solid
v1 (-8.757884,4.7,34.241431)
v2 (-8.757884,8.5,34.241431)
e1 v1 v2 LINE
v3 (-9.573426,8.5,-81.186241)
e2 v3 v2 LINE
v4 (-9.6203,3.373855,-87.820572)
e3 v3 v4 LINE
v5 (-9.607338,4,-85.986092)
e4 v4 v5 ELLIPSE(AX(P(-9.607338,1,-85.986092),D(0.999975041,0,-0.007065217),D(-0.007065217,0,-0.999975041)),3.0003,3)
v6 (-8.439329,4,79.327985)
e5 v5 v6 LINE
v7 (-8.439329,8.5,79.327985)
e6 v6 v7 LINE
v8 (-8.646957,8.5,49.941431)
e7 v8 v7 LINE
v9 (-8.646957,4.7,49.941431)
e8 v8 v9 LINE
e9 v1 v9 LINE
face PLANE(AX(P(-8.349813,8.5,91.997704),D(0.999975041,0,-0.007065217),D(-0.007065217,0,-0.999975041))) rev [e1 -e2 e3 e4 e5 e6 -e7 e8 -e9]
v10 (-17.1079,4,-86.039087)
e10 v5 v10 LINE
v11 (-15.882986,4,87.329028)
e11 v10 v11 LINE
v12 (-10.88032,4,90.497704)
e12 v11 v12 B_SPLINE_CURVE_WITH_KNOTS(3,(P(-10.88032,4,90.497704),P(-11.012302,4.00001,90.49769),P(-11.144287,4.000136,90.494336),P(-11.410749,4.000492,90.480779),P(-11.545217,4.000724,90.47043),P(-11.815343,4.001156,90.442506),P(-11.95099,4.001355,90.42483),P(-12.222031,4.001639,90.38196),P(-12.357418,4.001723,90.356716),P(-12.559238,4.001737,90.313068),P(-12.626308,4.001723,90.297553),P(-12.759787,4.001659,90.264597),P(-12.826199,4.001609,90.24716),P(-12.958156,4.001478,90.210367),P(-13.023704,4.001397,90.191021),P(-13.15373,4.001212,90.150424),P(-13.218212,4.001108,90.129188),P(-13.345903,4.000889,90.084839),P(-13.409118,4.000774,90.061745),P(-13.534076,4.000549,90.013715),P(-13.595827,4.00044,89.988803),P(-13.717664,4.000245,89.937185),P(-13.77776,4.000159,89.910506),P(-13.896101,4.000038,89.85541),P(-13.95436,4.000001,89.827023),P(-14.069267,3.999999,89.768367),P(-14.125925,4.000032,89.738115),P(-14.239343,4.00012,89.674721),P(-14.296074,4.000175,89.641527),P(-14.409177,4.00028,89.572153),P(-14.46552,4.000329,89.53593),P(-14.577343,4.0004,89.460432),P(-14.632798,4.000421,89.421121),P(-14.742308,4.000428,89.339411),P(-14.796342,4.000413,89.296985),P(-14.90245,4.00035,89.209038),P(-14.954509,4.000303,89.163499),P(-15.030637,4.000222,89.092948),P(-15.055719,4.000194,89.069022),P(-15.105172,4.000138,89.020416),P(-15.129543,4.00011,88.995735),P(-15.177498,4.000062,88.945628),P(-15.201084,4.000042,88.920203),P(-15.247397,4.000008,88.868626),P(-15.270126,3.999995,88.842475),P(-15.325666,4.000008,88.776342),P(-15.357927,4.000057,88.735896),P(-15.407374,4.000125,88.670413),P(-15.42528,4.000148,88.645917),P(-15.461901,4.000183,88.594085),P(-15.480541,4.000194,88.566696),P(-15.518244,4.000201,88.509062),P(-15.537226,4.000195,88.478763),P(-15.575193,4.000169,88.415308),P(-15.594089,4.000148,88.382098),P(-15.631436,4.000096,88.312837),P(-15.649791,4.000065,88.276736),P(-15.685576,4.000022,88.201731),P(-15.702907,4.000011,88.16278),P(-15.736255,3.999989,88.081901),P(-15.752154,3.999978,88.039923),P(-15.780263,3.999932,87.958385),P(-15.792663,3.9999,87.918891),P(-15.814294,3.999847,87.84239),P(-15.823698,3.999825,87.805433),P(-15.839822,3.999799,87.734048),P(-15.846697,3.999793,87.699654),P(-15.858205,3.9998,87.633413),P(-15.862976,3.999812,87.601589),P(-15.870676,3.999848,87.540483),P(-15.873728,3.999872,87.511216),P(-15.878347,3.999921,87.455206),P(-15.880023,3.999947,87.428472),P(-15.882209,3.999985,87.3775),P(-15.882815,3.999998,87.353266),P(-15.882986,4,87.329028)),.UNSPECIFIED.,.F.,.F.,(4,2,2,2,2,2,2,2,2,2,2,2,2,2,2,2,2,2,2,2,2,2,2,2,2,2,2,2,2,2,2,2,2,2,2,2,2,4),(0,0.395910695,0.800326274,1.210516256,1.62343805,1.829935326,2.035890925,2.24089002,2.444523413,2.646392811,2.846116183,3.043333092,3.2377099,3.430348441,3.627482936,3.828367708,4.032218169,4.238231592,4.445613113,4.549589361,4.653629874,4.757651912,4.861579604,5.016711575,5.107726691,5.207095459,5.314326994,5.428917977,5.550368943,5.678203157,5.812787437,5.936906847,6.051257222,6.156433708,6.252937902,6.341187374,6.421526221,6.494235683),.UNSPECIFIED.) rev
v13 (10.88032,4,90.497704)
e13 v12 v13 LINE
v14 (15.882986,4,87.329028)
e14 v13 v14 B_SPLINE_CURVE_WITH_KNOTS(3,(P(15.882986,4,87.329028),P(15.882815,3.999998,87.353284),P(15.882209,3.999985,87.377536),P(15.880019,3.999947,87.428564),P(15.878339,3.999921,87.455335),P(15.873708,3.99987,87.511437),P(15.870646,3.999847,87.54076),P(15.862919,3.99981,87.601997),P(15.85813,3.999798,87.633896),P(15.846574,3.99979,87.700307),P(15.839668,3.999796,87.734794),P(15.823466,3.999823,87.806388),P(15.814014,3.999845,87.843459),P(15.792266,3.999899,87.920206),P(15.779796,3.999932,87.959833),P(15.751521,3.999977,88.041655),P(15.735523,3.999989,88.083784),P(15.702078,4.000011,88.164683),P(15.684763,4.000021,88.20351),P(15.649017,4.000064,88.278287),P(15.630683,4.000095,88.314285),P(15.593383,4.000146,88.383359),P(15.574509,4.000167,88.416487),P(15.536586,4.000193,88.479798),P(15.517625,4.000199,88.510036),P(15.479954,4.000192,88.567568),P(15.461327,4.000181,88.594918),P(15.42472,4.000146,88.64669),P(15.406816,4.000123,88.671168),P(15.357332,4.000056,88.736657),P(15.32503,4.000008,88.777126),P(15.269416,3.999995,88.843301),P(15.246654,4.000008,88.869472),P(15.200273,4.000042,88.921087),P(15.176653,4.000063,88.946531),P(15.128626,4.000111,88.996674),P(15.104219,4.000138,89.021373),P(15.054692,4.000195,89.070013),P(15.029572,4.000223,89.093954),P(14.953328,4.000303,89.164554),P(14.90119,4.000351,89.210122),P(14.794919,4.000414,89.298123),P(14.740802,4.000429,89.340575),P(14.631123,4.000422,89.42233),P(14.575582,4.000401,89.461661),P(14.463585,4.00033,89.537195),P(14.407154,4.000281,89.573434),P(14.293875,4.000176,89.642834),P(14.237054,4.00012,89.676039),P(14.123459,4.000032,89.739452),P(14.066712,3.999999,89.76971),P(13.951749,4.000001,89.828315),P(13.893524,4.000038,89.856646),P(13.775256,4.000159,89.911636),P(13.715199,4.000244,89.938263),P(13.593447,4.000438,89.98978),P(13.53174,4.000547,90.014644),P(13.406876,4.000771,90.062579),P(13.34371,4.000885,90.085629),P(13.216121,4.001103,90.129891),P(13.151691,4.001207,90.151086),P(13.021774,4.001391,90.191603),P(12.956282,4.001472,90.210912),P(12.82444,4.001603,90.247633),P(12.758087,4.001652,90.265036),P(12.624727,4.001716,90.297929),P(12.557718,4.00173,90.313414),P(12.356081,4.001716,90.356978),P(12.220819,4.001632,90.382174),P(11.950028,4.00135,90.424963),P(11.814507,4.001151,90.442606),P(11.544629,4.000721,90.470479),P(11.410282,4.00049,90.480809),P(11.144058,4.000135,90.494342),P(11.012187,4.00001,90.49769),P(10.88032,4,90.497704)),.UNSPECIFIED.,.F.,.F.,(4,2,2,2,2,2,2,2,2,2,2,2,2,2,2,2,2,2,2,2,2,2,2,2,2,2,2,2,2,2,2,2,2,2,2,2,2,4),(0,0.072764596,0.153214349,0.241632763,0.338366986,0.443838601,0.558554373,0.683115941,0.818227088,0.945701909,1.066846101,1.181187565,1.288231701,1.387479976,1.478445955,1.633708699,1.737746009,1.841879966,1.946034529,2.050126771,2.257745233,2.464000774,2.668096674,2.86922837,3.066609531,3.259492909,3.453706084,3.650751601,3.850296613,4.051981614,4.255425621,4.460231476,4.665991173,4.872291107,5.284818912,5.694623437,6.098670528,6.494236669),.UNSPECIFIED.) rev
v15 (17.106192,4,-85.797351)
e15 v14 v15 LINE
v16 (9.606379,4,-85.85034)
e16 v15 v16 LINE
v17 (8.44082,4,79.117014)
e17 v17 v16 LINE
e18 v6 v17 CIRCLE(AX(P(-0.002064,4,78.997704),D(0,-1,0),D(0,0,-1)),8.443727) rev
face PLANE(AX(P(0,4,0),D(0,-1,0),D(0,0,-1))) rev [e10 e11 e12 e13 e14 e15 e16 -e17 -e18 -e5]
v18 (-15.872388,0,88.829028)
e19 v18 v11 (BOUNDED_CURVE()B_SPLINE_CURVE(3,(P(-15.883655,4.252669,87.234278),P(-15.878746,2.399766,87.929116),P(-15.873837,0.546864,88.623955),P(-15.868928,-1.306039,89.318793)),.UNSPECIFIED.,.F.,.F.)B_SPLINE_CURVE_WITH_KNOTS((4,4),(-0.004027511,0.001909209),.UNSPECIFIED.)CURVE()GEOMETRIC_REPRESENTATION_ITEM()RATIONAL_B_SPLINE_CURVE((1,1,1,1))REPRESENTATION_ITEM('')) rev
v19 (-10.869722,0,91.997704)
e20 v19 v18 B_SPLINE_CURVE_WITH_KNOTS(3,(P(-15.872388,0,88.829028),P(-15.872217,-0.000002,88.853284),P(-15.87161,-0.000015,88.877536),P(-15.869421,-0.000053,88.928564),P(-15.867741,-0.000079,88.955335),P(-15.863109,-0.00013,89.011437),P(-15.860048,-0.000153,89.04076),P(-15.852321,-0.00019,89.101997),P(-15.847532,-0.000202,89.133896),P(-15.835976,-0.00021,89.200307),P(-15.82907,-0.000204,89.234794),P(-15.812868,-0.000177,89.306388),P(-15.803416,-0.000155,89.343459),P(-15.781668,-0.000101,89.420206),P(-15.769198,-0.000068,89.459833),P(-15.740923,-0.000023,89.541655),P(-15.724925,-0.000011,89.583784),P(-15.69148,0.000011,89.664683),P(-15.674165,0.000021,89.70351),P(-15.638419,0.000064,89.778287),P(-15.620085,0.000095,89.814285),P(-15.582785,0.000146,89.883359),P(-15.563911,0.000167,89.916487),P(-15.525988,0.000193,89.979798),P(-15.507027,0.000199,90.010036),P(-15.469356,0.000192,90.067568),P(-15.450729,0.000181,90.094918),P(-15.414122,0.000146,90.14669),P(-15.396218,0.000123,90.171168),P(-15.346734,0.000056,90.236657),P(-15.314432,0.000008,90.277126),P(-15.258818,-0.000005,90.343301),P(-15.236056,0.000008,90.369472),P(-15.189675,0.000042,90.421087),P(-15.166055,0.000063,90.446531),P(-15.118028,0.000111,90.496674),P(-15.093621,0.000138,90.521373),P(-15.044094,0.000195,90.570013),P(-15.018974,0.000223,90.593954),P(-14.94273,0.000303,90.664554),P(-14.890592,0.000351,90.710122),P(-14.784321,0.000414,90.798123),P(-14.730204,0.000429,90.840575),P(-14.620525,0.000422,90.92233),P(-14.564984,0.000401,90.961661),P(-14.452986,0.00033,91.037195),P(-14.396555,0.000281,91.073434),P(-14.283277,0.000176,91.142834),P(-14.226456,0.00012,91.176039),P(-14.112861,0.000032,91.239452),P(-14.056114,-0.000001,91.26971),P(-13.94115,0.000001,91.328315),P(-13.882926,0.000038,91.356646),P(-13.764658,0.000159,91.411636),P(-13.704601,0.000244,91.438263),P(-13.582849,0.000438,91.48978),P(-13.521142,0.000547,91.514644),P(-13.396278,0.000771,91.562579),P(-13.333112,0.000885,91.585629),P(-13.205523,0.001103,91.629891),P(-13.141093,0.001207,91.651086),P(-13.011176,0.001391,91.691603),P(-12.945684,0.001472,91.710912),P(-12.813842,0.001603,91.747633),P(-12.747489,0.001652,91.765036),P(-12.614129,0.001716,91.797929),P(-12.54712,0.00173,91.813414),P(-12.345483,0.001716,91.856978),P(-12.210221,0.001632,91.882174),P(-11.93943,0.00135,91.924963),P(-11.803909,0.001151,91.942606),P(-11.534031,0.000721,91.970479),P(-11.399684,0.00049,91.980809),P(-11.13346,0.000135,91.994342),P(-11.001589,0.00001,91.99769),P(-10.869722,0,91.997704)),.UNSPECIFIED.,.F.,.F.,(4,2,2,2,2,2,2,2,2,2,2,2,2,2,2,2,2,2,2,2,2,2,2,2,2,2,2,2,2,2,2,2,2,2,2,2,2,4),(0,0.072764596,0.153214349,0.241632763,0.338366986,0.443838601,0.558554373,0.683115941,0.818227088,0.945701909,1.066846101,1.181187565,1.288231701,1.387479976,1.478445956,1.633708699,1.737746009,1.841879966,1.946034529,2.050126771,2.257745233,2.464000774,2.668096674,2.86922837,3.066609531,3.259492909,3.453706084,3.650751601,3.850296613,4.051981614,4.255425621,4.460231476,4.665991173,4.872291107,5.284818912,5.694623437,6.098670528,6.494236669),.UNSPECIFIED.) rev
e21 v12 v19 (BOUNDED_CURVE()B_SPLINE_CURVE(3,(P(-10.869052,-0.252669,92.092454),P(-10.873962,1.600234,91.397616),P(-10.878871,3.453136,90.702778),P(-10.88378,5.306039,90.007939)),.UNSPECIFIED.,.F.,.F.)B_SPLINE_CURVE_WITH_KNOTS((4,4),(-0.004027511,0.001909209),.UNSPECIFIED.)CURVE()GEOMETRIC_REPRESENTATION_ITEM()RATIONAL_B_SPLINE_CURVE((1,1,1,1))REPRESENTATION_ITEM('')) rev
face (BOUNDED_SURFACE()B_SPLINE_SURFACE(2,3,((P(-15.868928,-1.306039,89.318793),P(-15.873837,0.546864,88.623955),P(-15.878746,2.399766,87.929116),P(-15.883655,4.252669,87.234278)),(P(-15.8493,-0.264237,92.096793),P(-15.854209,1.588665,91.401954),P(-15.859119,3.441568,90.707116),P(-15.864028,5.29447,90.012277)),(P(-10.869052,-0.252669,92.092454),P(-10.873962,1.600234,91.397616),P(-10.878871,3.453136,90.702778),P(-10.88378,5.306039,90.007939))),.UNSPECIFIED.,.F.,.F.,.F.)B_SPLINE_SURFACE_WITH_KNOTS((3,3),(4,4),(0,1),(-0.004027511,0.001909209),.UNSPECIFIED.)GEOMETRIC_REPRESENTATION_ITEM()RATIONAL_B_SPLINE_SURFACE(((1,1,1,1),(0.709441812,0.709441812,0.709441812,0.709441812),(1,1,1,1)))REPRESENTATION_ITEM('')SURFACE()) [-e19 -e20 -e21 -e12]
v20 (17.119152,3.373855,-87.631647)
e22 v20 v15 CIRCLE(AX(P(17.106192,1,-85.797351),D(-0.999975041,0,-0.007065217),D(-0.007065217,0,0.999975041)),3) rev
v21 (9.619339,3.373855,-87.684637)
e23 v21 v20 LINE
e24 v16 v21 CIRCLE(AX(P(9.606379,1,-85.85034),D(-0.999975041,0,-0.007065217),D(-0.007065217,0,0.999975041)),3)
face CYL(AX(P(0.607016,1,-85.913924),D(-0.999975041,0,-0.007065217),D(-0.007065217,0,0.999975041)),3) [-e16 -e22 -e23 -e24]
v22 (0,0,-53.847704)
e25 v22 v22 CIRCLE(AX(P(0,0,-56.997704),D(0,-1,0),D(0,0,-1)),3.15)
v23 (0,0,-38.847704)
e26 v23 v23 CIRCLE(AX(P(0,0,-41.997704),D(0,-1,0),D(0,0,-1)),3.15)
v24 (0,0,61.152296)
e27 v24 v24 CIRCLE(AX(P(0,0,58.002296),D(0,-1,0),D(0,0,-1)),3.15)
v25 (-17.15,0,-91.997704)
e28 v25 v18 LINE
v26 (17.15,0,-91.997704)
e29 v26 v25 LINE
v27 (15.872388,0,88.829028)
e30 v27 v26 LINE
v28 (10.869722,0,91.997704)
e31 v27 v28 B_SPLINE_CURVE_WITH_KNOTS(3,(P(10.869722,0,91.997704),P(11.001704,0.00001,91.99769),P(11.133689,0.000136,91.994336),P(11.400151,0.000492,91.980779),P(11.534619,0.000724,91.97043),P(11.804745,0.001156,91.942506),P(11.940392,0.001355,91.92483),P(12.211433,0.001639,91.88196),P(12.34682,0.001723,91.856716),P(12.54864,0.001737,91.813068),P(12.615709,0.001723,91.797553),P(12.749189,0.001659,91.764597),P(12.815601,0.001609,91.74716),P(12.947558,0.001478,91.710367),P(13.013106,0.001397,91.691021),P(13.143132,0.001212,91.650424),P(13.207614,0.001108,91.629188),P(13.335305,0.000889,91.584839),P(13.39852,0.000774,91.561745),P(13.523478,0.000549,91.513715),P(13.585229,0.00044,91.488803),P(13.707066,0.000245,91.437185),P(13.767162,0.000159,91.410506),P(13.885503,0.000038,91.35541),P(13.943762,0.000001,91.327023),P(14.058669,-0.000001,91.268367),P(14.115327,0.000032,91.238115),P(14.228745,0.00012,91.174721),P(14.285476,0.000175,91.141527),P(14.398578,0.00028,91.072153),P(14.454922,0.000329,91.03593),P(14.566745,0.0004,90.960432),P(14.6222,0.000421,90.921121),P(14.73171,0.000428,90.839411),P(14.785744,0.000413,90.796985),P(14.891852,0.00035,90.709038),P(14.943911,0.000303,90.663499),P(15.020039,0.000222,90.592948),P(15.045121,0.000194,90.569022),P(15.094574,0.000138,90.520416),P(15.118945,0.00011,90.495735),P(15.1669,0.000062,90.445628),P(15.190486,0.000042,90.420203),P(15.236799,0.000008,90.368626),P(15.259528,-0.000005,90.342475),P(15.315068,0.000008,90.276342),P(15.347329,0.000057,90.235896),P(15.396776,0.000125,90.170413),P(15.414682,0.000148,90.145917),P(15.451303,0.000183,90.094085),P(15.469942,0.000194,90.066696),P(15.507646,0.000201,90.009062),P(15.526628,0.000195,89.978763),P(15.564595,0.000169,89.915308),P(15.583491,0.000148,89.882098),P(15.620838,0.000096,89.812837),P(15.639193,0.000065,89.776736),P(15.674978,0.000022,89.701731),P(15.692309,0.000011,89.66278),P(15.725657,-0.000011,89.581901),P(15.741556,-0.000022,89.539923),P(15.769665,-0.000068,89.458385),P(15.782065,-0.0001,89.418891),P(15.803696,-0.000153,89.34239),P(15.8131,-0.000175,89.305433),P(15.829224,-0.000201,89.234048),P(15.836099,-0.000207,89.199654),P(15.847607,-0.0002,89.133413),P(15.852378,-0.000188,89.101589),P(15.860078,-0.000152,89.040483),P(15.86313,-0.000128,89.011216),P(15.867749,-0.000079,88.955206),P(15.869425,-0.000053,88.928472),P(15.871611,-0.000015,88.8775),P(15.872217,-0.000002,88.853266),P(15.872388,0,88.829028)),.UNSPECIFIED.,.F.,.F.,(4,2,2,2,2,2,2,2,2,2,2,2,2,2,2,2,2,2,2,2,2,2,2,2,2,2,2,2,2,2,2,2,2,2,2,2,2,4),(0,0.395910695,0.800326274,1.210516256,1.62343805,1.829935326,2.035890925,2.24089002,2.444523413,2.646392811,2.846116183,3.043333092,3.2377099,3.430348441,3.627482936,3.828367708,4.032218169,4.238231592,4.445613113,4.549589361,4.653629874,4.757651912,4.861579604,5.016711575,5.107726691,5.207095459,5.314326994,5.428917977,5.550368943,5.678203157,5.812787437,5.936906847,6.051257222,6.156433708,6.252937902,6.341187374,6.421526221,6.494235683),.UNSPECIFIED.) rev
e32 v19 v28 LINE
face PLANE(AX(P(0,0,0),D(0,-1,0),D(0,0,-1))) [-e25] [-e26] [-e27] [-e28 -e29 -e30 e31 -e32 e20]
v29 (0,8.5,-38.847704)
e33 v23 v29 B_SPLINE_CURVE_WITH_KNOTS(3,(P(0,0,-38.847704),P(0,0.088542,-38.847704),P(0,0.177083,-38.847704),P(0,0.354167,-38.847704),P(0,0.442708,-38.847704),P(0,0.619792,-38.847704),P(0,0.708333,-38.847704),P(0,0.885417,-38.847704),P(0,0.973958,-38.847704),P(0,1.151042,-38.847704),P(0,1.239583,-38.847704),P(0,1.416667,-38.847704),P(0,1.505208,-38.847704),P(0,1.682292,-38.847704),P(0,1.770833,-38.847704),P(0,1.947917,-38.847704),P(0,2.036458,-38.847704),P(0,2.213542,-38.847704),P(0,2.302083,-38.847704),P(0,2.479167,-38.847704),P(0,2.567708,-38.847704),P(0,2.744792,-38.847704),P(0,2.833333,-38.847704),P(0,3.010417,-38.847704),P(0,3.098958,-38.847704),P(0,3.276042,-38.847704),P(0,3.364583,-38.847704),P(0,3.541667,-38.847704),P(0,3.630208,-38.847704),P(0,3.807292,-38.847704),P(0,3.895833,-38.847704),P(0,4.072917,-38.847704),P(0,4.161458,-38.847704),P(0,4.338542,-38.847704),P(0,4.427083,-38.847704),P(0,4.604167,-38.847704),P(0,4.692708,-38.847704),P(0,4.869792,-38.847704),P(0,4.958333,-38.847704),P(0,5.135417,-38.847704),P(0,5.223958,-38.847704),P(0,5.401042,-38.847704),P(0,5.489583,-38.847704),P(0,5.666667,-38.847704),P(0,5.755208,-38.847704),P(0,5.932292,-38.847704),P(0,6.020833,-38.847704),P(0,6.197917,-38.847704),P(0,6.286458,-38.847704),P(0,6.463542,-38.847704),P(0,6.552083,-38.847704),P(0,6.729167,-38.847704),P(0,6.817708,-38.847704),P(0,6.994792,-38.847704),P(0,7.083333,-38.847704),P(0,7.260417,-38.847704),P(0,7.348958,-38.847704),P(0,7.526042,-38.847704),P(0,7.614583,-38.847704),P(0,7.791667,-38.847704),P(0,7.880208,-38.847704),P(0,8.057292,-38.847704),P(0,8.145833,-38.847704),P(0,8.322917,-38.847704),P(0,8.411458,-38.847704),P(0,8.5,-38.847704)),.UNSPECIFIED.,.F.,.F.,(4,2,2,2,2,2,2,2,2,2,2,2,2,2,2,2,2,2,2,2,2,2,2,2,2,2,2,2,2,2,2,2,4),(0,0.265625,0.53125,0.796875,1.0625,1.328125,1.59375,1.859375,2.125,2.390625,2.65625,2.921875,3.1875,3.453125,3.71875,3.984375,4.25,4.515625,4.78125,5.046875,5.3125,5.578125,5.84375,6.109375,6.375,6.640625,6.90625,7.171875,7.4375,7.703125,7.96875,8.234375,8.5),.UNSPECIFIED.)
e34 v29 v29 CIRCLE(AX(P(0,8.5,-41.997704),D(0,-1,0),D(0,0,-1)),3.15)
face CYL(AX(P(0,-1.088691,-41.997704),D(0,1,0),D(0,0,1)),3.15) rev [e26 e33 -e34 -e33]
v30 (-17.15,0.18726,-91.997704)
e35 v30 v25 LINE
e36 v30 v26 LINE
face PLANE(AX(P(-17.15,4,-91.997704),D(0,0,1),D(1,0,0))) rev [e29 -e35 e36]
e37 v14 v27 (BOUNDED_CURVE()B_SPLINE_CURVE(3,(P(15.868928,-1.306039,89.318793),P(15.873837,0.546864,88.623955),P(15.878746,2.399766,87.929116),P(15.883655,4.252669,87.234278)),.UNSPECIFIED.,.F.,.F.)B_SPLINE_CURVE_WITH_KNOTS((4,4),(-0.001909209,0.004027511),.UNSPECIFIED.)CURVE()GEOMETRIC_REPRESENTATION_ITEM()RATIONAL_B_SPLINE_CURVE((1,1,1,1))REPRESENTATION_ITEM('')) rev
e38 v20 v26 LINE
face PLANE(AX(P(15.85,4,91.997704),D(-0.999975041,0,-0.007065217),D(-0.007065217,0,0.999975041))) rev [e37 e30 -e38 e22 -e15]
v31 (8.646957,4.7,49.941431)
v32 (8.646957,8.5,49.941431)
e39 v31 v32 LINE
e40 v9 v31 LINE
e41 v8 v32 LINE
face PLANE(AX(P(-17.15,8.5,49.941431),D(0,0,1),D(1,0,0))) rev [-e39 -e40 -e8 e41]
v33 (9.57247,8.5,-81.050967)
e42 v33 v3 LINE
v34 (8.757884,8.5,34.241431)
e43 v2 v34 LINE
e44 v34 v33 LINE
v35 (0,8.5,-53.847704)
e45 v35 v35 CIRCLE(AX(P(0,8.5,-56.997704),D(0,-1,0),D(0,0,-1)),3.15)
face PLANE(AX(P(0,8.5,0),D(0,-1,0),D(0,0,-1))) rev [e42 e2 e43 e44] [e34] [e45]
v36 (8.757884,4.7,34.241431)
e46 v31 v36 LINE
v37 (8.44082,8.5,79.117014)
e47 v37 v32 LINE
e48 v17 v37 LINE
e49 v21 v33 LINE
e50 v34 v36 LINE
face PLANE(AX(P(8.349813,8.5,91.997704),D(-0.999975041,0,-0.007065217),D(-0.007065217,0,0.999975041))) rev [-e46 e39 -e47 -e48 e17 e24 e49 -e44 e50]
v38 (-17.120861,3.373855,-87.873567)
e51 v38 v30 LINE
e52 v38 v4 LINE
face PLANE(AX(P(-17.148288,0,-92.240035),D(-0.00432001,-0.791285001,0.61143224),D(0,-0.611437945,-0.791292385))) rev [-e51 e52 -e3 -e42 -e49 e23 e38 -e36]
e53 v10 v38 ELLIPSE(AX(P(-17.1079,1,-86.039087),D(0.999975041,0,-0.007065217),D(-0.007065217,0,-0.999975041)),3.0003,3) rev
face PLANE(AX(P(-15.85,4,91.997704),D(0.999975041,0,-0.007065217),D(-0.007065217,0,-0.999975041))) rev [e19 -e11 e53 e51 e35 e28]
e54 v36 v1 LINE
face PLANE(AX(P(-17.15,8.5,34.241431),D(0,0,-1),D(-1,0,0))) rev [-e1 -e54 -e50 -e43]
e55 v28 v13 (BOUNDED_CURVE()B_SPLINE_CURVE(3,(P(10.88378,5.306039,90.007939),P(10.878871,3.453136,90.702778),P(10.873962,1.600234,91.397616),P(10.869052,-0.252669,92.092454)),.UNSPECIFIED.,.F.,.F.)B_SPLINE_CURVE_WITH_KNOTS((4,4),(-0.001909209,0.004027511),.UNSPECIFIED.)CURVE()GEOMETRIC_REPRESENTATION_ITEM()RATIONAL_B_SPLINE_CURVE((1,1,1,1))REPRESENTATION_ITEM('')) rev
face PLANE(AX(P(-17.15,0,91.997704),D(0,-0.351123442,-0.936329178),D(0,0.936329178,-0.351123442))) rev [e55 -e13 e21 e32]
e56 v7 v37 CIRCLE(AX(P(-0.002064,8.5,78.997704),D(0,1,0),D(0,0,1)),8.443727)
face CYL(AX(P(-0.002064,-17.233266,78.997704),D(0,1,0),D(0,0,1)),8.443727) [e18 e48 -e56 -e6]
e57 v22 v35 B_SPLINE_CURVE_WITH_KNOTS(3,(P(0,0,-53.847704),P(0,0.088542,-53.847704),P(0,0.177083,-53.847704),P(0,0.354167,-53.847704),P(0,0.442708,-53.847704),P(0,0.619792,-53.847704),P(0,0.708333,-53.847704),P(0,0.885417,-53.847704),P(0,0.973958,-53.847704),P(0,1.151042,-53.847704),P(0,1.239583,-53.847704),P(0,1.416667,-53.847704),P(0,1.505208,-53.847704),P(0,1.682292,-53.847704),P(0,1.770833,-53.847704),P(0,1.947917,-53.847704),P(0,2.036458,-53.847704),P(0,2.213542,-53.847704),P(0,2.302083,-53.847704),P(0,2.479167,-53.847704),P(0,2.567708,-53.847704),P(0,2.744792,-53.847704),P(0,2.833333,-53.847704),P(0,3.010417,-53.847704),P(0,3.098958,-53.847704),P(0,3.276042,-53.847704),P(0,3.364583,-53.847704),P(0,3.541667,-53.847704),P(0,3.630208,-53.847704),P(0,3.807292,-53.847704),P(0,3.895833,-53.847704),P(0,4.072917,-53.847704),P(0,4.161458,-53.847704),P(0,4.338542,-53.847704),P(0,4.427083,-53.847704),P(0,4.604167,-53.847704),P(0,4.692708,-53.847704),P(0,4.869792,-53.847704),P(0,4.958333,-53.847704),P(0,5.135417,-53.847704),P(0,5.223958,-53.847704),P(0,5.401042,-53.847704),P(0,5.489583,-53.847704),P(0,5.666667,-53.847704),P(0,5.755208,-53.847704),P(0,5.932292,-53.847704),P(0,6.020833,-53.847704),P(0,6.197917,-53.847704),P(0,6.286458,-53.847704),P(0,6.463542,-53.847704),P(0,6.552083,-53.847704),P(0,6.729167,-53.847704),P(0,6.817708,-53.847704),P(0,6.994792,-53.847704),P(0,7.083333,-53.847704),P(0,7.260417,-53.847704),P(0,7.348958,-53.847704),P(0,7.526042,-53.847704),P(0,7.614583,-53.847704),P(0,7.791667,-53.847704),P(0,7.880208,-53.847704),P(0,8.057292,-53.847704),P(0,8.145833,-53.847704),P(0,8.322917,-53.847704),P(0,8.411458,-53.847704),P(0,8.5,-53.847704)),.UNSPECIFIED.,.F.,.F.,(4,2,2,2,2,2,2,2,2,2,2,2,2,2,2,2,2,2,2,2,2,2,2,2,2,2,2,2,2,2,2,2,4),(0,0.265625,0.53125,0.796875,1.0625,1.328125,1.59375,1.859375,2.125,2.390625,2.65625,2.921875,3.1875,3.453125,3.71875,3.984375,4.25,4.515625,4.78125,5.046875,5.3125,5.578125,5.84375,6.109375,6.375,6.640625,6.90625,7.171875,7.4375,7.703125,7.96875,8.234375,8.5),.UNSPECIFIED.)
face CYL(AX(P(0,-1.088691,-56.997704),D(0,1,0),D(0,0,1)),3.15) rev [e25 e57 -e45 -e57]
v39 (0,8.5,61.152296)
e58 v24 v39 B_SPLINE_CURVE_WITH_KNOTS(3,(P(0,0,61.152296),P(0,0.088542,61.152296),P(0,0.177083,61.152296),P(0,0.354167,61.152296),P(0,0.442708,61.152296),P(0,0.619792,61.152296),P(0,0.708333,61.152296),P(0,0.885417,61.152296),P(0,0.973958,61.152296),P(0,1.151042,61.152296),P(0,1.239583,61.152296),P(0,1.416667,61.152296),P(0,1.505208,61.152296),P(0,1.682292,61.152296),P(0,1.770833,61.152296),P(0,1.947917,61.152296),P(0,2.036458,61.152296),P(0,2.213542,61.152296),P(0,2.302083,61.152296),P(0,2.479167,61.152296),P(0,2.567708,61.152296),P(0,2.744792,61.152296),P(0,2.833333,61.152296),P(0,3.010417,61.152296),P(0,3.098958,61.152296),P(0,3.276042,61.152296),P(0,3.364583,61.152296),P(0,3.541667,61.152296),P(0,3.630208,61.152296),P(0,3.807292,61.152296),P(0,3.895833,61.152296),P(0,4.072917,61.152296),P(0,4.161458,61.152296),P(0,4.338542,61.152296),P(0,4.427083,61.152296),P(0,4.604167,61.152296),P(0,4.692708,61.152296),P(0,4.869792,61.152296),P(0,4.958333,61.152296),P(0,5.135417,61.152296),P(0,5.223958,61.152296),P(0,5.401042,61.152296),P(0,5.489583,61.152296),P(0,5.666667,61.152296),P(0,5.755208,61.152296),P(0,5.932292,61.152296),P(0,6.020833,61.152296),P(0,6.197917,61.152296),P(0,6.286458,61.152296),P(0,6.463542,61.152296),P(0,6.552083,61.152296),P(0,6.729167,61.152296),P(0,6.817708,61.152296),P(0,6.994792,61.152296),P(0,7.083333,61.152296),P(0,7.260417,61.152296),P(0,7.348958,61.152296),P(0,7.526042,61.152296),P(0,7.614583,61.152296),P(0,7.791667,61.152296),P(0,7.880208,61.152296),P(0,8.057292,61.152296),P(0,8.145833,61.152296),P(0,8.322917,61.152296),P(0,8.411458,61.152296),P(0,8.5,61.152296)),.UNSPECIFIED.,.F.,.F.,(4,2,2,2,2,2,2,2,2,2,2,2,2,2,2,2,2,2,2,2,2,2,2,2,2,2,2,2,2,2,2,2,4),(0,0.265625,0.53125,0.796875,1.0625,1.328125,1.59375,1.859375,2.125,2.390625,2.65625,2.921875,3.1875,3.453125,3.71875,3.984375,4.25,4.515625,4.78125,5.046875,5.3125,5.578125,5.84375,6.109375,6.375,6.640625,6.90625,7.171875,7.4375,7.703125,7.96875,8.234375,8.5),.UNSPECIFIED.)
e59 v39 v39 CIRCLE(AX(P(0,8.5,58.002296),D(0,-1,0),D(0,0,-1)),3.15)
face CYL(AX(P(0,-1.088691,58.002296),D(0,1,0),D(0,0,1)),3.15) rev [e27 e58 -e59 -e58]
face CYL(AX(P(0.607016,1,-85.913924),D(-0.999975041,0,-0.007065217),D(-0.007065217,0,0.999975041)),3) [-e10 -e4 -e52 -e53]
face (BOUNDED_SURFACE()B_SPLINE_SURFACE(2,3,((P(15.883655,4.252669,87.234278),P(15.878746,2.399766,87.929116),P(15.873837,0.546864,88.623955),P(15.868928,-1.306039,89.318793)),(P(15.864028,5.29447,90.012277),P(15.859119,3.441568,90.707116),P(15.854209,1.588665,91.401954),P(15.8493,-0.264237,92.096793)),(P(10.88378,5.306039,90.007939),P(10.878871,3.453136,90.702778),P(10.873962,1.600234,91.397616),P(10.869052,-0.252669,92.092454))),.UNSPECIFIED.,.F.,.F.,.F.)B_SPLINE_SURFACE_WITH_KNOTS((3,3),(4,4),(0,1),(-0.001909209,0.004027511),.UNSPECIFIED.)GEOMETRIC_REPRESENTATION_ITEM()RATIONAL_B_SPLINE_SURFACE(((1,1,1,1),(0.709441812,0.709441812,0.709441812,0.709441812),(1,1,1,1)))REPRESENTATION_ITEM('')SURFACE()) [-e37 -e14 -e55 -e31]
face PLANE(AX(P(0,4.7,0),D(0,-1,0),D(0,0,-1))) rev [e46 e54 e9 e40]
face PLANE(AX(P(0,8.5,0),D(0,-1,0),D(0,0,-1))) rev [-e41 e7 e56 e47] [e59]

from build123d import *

# Parameters (mm, degrees)
BOSS_EXTRUDE1_DEPTH     = 4
BOSS_EXTRUDE2_DEPTH     = 4.5
CUT_EXTRUDE1_DEPTH      = 99.435547891
CUT_EXTRUDE1_DEPTH_BACK = 99.435547891
CUT_EXTRUDE2_START      = -4.5
CUT_EXTRUDE2_DEPTH      = 4.5
CUT_EXTRUDE3_DEPTH      = 95.023100537
CUT_EXTRUDE3_DEPTH_BACK = 95.023100537
CUT_EXTRUDE4_DEPTH      = 94.998158329
CUT_EXTRUDE4_DEPTH_BACK = 94.998158329
SKETCH6_W               = 15.7
SKETCH6_H               = 4.5
FILLET1_R               = 3
BOSS_EXTRUDE3_DEPTH     = 0.7
CUT_EXTRUDE5_DEPTH      = 94.967813764
CUT_EXTRUDE5_DEPTH_BACK = 94.967813764
SKETCH8_R               = 3.15


# Read off the part's stored shape, not the designer's step: Cut-Extrude2
with BuildPart() as part:
    # Sketch1 → Boss-Extrude1 (new body)
    with BuildSketch(Plane(origin=(0, 0, 0), x_dir=(1, 0, 0), z_dir=(0, 1, 0))):
        Polygon((-15.85, -91.997703776), (15.85, -91.997703776), (17.15, 91.997703776), (-17.15, 91.997703776), align=None)
    extrude(amount=BOSS_EXTRUDE1_DEPTH)

    # Sketch2 → Boss-Extrude2 (add)
    with BuildSketch(Plane(origin=(0, 4, 0), x_dir=(1, 0, 0), z_dir=(0, 1, 0))):
        Polygon((-8.349812803, -91.997703776), (8.349812803, -91.997703776), (9.649812803, 91.997703776), (-9.649812803, 91.997703776), align=None)
    extrude(amount=BOSS_EXTRUDE2_DEPTH)

    # Sketch3 → Cut-Extrude1 (cut, two sides: drawn at the far end of the back side and taken through both)
    with BuildSketch(Plane(origin=(16.499176365, 0, 0.116573177), x_dir=(0.007065217391304343, 0, -0.9999750410401319), z_dir=(0.999975041040132, 0, 0.0070652173913043435)).offset(-CUT_EXTRUDE1_DEPTH_BACK)):
        Polygon((92.116576087, 0), (81.116576087, 8.5), (92.116576087, 8.5), align=None)
    extrude(amount=CUT_EXTRUDE1_DEPTH + CUT_EXTRUDE1_DEPTH_BACK, mode=Mode.SUBTRACT)

    # Cut-Extrude2 outline → Cut-Extrude2 (cut)
    with BuildSketch(Plane(origin=(0, 8.5, 0), x_dir=(1, 0, 0), z_dir=(0, 1, 0)).offset(CUT_EXTRUDE2_START)):
        with BuildLine():
            ThreePointArc((8.440819946, -79.117014334), (0.10345841, -87.440771539), (-8.439329356, -79.327984806))
            Line((-8.439329356, -79.327984806), (-8.349812803, -91.997703776))
            Line((-8.349812803, -91.997703776), (8.349812803, -91.997703776))
            Line((8.349812803, -91.997703776), (8.440819946, -79.117014334))
        make_face()
    extrude(amount=CUT_EXTRUDE2_DEPTH, mode=Mode.SUBTRACT)

    # Sketch5 → Cut-Extrude3 (cut, two sides: drawn at the far end of the back side and taken through both)
    with BuildSketch(Plane(origin=(0, 0, 0.056470136), x_dir=(0, 0, -1), z_dir=(1, 0, 0)).offset(-CUT_EXTRUDE3_DEPTH_BACK)):
        Polygon((-91.941233639, 0), (-90.441233639, 4), (-91.941233639, 4), align=None)
    extrude(amount=CUT_EXTRUDE3_DEPTH + CUT_EXTRUDE3_DEPTH_BACK, mode=Mode.SUBTRACT)

    # Sketch6 → Cut-Extrude4 (cut, two sides: drawn at the far end of the back side and taken through both)
    with BuildSketch(Plane(origin=(0, 0, 0.030994299), x_dir=(0, 0, -1), z_dir=(1, 0, 0)).offset(-CUT_EXTRUDE4_DEPTH_BACK)):
        with Locations((-42.060436633, 6.25)):
            Rectangle(SKETCH6_W, SKETCH6_H)
    extrude(amount=CUT_EXTRUDE4_DEPTH + CUT_EXTRUDE4_DEPTH_BACK, mode=Mode.SUBTRACT)

    # Fillet1
    fillet1_edges = [part.edges().sort_by_distance(p)[0] for p in [
        (13.363520706, 4, -86.847856952),
        (-13.364854981, 4, -87.03670345),
    ]]
    fillet(fillet1_edges, radius=FILLET1_R)

    # Fillet3
    # an asymmetric fillet: 5, 3 mm, written as the material it takes off along each edge
    with BuildSketch(Plane(origin=(-15.891485902, 15.657877718, 86.125999632), x_dir=(-0.006615348832314233, -0.3511311249673921, -0.9363029265355098), z_dir=(0.002480817730747878, -0.9363262962659619, 0.3511223610997357))) as fillet3_piece_1:
        with BuildLine():
            Bezier((2.966988077, 0), (0, 0), (-0.032946278, 4.980153892), weights=[1, 0.709441812, 1])
            Line((-0.032946278, 4.980153892), (0, 0))
            Line((0, 0), (2.966988077, 0))
        make_face()
    extrude(amount=29.173329366, mode=Mode.SUBTRACT)
    with BuildSketch(Plane(origin=(15.819112189, -11.657877718, 96.36940792), x_dir=(-0.9999969227669587, 0.002322862025529483, -0.0008710732595747153), z_dir=(0.002480817730747878, 0.9363262962659619, -0.3511223610997357))) as fillet3_piece_2:
        with BuildLine():
            Bezier((4.98026287, 0), (0, 0), (-0.019627722, -2.966923154), weights=[1, 0.709441812, 1])
            Line((-0.019627722, -2.966923154), (0, 0))
            Line((0, 0), (4.98026287, 0))
        make_face()
    extrude(amount=29.173329366, mode=Mode.SUBTRACT)

    # Sketch7 → Boss-Extrude3 (add)
    with BuildSketch(Plane(origin=(0, 4, 0), x_dir=(1, 0, 0), z_dir=(0, 1, 0))):
        Polygon((-8.64695693, -49.941430932), (-8.757883612, -34.241430932), (8.757883612, -34.241430932), (8.64695693, -49.941430932), align=None)
    extrude(amount=BOSS_EXTRUDE3_DEPTH)

    # Sketch8 → Cut-Extrude5 (cut, two sides: drawn at the far end of the back side and taken through both)
    with BuildSketch(Plane(origin=(0, 8.5, 0), x_dir=(1, 0, 0), z_dir=(0, 1, 0)).offset(-CUT_EXTRUDE5_DEPTH_BACK)):
        with Locations(Location((0, -58.002296224, 0), (0, 0, 270))):
            Circle(SKETCH8_R)
        with Locations(Location((0, 56.997703776, 0), (0, 0, 270))):
            Circle(SKETCH8_R)
        with Locations(Location((0, 41.997703776, 0), (0, 0, 270))):
            Circle(SKETCH8_R)
    extrude(amount=CUT_EXTRUDE5_DEPTH + CUT_EXTRUDE5_DEPTH_BACK, mode=Mode.SUBTRACT)


solid = part.part
